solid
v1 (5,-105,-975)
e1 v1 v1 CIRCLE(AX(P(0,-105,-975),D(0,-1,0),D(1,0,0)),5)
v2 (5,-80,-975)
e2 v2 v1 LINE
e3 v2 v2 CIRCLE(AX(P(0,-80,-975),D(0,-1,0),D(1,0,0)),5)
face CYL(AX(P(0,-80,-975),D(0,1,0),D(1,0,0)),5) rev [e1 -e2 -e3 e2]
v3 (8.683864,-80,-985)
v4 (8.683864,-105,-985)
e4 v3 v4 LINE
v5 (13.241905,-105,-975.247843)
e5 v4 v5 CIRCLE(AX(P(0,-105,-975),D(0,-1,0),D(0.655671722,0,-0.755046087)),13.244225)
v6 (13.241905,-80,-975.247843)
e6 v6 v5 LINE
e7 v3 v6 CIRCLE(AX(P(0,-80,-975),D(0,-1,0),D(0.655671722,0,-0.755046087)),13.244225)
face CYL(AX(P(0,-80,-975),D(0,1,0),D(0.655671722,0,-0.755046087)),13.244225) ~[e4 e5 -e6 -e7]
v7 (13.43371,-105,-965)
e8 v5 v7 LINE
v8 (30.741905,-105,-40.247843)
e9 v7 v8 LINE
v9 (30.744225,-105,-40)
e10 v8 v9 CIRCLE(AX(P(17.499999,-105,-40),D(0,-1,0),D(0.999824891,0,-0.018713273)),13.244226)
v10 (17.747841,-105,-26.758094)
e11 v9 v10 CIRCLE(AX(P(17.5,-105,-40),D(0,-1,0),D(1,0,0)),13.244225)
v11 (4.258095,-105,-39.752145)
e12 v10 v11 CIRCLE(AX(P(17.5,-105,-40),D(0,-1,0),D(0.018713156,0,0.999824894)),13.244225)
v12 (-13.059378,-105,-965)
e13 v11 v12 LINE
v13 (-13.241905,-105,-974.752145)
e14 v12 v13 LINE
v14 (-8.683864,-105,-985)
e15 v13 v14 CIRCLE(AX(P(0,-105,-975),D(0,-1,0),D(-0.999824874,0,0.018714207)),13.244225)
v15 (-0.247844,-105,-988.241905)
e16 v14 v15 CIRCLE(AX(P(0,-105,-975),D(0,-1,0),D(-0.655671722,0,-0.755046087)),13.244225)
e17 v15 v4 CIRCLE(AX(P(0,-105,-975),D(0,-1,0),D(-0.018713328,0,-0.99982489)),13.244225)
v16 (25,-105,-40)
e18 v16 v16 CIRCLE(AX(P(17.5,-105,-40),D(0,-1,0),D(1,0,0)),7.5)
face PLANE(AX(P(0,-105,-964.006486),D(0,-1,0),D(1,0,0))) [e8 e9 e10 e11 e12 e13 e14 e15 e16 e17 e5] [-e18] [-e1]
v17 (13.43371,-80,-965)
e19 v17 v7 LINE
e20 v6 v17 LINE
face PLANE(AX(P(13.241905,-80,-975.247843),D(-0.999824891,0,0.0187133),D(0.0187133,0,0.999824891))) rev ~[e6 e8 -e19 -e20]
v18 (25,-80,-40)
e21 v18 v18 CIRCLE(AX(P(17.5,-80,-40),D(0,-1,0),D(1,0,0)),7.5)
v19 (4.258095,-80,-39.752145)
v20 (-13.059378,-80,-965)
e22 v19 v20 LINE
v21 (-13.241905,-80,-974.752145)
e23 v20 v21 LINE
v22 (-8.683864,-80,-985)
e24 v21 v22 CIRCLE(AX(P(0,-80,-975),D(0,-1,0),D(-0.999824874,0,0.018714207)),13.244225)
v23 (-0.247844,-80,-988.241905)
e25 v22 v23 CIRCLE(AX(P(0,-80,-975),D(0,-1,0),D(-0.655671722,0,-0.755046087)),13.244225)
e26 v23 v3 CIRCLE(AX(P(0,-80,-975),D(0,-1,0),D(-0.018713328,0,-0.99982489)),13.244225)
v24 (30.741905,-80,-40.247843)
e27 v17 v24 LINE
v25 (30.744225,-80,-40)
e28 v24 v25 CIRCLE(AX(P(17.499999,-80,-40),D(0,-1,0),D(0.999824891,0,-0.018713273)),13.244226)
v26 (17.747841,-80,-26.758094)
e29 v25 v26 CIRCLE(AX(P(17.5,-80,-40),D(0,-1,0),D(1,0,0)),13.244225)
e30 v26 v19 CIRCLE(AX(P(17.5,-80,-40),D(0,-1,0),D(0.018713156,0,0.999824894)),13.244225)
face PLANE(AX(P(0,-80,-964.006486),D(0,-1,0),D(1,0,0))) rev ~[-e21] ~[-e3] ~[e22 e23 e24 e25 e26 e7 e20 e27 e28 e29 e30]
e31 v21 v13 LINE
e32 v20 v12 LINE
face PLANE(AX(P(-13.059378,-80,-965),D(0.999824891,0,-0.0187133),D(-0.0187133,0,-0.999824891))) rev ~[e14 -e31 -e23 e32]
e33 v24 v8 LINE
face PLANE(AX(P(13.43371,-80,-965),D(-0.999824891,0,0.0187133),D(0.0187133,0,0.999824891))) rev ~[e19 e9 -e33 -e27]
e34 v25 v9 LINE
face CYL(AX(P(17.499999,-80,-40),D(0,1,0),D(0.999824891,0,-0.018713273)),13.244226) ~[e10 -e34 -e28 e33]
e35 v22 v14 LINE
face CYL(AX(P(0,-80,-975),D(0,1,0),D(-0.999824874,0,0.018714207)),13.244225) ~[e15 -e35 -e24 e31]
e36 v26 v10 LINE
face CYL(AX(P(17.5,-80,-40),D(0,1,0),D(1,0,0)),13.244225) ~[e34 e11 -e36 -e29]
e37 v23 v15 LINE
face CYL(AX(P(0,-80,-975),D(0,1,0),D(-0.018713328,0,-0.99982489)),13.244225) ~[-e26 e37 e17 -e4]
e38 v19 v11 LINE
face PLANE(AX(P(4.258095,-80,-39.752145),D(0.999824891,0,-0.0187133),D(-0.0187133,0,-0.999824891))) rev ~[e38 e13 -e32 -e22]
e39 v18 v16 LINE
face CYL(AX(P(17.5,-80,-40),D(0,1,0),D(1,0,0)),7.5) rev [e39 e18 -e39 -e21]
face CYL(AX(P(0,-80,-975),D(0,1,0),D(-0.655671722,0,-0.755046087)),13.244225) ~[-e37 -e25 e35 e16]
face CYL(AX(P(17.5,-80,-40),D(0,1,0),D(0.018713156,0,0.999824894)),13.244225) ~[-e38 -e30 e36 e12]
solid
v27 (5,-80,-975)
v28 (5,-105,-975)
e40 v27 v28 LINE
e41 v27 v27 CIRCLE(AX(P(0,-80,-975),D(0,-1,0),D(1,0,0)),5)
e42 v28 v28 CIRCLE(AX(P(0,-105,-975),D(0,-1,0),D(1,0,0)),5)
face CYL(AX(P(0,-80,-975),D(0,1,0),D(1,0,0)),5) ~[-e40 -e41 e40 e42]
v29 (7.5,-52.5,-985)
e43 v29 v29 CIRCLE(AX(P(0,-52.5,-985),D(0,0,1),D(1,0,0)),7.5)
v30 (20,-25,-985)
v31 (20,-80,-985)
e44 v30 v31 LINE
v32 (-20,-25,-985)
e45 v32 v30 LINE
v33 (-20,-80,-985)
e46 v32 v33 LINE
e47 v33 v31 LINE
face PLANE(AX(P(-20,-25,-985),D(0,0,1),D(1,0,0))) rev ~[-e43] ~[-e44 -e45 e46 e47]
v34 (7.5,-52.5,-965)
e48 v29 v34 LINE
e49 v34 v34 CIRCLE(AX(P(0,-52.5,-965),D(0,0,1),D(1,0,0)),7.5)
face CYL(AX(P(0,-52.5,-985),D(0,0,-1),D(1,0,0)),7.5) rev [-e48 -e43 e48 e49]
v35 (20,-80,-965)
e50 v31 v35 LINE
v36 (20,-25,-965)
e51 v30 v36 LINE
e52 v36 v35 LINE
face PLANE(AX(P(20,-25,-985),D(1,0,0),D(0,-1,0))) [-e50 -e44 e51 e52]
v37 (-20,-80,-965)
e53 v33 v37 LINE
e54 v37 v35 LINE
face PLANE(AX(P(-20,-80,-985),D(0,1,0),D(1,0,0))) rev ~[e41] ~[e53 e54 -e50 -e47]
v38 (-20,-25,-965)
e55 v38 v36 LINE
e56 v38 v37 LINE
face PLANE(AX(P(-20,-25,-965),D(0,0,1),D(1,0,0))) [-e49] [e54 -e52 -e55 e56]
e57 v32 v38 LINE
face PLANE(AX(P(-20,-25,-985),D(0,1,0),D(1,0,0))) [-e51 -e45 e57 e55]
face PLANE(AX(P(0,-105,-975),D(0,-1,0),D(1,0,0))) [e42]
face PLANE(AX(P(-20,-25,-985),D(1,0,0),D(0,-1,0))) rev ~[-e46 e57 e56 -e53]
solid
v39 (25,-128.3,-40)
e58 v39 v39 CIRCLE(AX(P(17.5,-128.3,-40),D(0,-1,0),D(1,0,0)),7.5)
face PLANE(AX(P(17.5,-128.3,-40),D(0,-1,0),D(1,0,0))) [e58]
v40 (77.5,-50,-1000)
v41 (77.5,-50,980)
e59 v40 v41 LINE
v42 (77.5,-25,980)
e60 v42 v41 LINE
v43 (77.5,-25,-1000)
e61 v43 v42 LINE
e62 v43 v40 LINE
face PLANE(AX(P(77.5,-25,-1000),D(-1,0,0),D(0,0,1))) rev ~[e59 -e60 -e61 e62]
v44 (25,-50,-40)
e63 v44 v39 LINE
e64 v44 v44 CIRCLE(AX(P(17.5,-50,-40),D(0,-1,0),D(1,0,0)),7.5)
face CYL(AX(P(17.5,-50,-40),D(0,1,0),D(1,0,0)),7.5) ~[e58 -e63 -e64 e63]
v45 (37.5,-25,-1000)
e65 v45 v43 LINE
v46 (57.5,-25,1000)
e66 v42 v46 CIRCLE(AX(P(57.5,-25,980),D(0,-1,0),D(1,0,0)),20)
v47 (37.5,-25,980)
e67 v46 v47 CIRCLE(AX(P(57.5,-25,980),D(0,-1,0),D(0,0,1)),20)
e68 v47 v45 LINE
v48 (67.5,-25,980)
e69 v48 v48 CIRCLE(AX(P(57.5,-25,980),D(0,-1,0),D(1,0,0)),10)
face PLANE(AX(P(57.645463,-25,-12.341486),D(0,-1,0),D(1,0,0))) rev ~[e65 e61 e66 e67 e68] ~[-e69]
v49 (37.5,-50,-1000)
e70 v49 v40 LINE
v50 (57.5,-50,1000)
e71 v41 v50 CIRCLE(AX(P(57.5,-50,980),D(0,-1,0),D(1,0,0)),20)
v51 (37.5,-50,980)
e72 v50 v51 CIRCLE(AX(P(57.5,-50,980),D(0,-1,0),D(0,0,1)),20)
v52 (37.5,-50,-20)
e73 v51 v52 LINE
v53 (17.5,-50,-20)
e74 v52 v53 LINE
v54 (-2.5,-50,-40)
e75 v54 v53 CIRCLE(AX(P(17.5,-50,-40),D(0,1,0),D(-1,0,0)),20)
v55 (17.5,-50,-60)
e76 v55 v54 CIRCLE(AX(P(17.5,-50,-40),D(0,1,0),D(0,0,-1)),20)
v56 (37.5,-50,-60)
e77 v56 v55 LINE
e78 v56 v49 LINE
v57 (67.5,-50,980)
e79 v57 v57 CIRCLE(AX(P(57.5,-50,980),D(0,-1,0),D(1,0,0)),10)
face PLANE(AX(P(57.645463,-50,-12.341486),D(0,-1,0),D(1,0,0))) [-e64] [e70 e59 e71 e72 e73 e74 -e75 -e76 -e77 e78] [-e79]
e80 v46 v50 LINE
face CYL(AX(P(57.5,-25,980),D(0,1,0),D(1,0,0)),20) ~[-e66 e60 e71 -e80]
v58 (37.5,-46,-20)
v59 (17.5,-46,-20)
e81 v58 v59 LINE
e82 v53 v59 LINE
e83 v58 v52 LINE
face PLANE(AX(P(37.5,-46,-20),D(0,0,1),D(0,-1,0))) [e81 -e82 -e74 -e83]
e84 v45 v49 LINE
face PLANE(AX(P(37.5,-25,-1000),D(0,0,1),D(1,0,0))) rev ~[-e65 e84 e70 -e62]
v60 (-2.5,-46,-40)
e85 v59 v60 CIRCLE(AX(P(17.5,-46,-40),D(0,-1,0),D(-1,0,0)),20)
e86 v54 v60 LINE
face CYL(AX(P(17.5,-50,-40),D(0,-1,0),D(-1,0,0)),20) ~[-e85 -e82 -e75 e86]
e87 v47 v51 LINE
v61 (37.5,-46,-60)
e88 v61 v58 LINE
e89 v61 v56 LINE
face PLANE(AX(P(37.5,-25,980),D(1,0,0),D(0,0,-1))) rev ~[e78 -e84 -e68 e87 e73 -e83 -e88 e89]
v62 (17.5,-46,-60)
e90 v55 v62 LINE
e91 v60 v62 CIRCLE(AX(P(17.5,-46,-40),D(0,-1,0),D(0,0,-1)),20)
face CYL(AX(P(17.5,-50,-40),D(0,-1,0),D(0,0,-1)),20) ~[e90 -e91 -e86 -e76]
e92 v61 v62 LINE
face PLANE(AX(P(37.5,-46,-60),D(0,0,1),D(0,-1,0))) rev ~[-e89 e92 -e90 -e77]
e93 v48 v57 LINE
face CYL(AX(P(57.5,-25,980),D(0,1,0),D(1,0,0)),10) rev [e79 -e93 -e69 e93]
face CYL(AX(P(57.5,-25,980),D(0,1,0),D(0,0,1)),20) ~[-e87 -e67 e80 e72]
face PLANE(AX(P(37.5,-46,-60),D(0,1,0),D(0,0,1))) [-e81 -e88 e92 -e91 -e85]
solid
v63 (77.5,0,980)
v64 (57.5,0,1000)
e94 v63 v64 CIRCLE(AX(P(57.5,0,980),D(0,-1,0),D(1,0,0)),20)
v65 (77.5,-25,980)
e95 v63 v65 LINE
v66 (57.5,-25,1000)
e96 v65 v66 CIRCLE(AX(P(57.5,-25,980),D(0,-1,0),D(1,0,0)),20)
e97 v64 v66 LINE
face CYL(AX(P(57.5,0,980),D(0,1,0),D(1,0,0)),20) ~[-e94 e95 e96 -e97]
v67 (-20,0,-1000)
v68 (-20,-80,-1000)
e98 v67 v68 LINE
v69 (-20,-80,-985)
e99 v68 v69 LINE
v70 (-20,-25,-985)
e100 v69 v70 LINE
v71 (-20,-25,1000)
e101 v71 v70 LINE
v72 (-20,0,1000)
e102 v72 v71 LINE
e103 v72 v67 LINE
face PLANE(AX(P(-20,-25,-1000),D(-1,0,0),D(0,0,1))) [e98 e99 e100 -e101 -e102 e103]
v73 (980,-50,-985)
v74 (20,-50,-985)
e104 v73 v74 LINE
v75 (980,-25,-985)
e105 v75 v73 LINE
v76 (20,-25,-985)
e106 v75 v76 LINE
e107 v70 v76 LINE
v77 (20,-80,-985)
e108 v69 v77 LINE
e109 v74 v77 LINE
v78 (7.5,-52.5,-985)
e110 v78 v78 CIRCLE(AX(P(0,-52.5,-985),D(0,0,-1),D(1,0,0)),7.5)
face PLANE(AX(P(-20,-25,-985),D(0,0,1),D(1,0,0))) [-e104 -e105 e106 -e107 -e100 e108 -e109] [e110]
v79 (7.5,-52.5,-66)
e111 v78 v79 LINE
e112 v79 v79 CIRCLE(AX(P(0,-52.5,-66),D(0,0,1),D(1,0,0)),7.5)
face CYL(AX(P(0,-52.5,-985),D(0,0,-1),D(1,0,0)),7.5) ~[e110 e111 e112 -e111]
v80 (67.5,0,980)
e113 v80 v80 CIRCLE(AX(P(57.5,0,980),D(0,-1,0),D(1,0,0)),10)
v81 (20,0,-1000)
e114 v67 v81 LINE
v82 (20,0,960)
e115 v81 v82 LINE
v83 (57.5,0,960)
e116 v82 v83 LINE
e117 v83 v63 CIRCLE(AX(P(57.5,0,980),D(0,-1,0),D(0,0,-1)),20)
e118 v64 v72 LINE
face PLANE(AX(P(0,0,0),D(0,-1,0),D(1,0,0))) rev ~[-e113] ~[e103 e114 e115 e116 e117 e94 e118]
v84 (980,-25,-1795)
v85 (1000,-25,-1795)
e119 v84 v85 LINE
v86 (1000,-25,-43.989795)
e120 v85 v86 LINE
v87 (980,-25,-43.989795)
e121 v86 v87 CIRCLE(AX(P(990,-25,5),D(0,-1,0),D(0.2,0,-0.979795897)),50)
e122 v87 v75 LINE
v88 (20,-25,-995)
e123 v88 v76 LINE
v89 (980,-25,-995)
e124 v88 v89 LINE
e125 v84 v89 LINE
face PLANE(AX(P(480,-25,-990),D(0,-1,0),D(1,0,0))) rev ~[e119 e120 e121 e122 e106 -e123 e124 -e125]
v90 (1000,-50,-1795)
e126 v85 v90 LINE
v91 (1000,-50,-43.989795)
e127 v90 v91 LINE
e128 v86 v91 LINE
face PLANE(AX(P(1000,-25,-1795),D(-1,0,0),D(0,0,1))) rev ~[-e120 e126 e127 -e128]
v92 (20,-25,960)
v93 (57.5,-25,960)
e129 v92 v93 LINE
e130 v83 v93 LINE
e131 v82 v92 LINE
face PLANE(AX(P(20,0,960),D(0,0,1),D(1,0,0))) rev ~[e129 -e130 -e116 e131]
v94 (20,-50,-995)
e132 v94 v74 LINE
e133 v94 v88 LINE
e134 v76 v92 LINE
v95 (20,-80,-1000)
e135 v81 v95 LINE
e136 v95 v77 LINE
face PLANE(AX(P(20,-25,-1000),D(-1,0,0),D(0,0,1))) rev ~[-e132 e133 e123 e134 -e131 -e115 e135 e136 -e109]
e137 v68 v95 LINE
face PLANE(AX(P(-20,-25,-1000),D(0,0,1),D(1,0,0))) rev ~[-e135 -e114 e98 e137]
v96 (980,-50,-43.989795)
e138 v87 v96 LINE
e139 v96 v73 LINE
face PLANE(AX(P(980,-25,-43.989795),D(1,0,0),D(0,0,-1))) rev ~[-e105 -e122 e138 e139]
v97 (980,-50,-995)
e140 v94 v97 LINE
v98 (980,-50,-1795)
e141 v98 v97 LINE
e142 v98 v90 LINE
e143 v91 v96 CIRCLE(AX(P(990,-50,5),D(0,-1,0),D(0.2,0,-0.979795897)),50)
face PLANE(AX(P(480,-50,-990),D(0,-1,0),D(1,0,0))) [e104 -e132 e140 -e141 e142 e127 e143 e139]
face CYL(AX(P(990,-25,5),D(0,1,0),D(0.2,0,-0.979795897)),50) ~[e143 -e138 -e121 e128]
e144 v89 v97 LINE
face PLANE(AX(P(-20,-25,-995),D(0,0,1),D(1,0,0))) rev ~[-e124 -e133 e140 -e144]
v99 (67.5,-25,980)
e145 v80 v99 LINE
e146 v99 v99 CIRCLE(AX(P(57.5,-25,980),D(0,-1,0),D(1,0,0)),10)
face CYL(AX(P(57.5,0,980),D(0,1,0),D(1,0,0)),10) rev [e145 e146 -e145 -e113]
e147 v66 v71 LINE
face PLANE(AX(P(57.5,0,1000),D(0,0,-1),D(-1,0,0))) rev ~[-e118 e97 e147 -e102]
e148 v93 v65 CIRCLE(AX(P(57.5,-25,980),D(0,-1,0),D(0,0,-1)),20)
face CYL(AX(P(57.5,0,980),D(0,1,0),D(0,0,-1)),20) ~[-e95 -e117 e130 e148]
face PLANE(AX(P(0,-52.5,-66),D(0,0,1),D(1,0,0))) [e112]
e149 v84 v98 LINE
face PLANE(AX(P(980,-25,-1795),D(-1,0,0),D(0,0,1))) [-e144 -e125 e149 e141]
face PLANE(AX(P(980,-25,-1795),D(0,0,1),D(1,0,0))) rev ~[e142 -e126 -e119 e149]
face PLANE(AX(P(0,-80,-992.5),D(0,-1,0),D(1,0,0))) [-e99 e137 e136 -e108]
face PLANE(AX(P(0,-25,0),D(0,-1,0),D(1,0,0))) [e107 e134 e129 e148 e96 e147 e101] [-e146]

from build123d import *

# Parameters (mm, degrees)
F0_R      = 10
F1_DEPTH  = 25
F2_R      = 10
F3_DEPTH  = 25
F4_W      = 40
F4_H      = 15
F5_DEPTH  = 55
F6_W      = 4
F6_H      = 40
F7_DEPTH  = 40
F9_DEPTH  = 5
F10_R     = 7.5
F11_DEPTH = 919
F12_DEPTH = 20
F14_R     = 5
F14_R_2   = 7.5
F15_DEPTH = 25
F13_R     = 5
F16_DEPTH = 25
F8_R      = 7.5
F17_DEPTH = 78.3
F18_W     = 1000
F18_H     = 10
F18_W_2   = 20
F18_H_2   = 800
F19_DEPTH = 25


with BuildPart() as f1:
    # F0 (on Front) → F1 (new body)
    with BuildSketch(Plane.XZ):
        Polygon((20, 960), (20, 1000), (-20, 1000), (-20, -1000), (20, -1000), align=None)
        with BuildLine():
            Line((57.5, 1000), (20, 1000))
            Line((20, 1000), (20, 960))
            Line((20, 960), (57.5, 960))
            ThreePointArc((57.5, 960), (37.5, 980), (57.5, 1000))
        make_face()
        with BuildLine():
            ThreePointArc((77.5, 980), (71.6421356237, 994.1421356237), (57.5, 1000))
            ThreePointArc((57.5, 1000), (37.5, 980), (57.5, 960))
            ThreePointArc((57.5, 960), (71.6421356237, 965.8578643763), (77.5, 980))
        make_face()
        with Locations((57.5, 980)):
            Circle(F0_R, mode=Mode.SUBTRACT)
    extrude(amount=F1_DEPTH)

    # F4 (on face) → F5 (join)
    with BuildSketch(Plane.XZ.offset(25)):
        with Locations((0, -992.5)):
            Rectangle(F4_W, F4_H)
    extrude(amount=F5_DEPTH)

    # F10 (on face) → F11 (join)
    with BuildSketch(Plane.XY.offset(-985)):
        with Locations((0, -52.5)):
            Circle(F10_R)
    extrude(amount=F11_DEPTH)


with BuildPart() as f3:
    # F2 (on face) → F3 (new body)
    with BuildSketch(Plane.XZ.offset(25)):
        with BuildLine():
            Line((77.5, -1000), (77.5, 980))
            ThreePointArc((77.5, 980), (71.6421356237, 965.8578643763), (57.5, 960))
            Line((57.5, 960), (37.5, 960))
            Line((37.5, 960), (37.5, -1000))
            Line((37.5, -1000), (77.5, -1000))
        make_face()
        with BuildLine():
            ThreePointArc((77.5, 980), (71.6421356237, 994.1421356237), (57.5, 1000))
            ThreePointArc((57.5, 1000), (43.3578643763, 994.1421356237), (37.5, 980))
            ThreePointArc((37.5, 980), (43.3578643763, 965.8578643763), (57.5, 960))
            ThreePointArc((57.5, 960), (71.6421356237, 965.8578643763), (77.5, 980))
        make_face()
        with Locations((57.5, 980)):
            Circle(F2_R, mode=Mode.SUBTRACT)
        with BuildLine():
            ThreePointArc((57.5, 960), (43.3578643763, 965.8578643763), (37.5, 980))
            Line((37.5, 980), (37.5, 960))
            Line((37.5, 960), (57.5, 960))
        make_face()
    extrude(amount=F3_DEPTH)

    # F6 (on face) → F7 (join)
    with BuildSketch(Plane(origin=(37.5, 0, 0), x_dir=(0, -1, 0), z_dir=(-1, 0, 0))):
        with Locations((48, -40)):
            Rectangle(F6_W, F6_H)
    extrude(amount=F7_DEPTH)

    # F8 (on face) → F9 (cut)
    with BuildSketch(Plane.XZ.offset(50)):
        with BuildLine():
            ThreePointArc((-2.5, -40), (3.3578643763, -25.8578643763), (17.5, -20))
            Line((17.5, -20), (-2.5, -20))
            Line((-2.5, -20), (-2.5, -40))
        make_face()
        with BuildLine():
            Line((-2.5, -60), (17.5, -60))
            ThreePointArc((17.5, -60), (3.3578643763, -54.1421356237), (-2.5, -40))
            Line((-2.5, -40), (-2.5, -60))
        make_face()
    extrude(amount=-F9_DEPTH, mode=Mode.SUBTRACT)

    # F8 (on face) → F17 (join)
    with BuildSketch(Plane.XZ.offset(50)):
        with Locations((17.5, -40)):
            Circle(F8_R)
    extrude(amount=F17_DEPTH)


with BuildPart() as f12:
    # F12 (new): a face of the model
    f12_faces = [f1.part.faces().sort_by_distance(p)[0] for p in [
        (19.3199264746, -52.5, -985),
    ]]
    extrude(f12_faces, amount=F12_DEPTH)

    # F13 (on face) → F16 (join)
    with BuildSketch(Plane.XZ.offset(80)):
        with Locations((0, -975)):
            Circle(F13_R)
    extrude(amount=F16_DEPTH)


with BuildPart() as f15:
    # F14 (on face) → F15 (new body)
    with BuildSketch(Plane.XZ.offset(80)):
        with BuildLine():
            Line((-8.6838635851, -965), (8.6838635851, -965))
            ThreePointArc((8.6838635851, -965), (0, -961.755775343), (-8.6838635851, -965))
        make_face()
        with BuildLine():
            Line((13.2419054738, -975.2478430705), (13.4337100232, -965))
            Line((13.4337100232, -965), (8.6838635851, -965))
            ThreePointArc((8.6838635851, -965), (12.0503221321, -969.5046180045), (13.244224657, -975))
            ThreePointArc((13.244224657, -975), (13.2436448485, -975.1239269605), (13.2419054738, -975.2478430705))
        make_face()
        with BuildLine():
            Line((-8.6838635851, -965), (-13.0593784724, -965))
            Line((-13.0593784724, -965), (-13.2419052476, -974.7521448442))
            ThreePointArc((-13.2419052476, -974.7521448442), (-11.9983714308, -969.3920975603), (-8.6838635851, -965))
        make_face()
        with BuildLine():
            ThreePointArc((-0.2478435243, -988.2419054653), (4.5187494263, -987.4495136606), (8.6838635851, -985))
            Line((8.6838635851, -985), (-8.6838635851, -985))
            ThreePointArc((-8.6838635851, -985), (-4.7509299861, -987.3627727889), (-0.2478435243, -988.2419054653))
        make_face()
        with BuildLine():
            Line((13.4337100232, -965), (30.7419054788, -40.2478428035))
            ThreePointArc((30.7419054788, -40.2478428035), (17.2521509276, -53.2419053614), (4.2580947559, -39.7521446587))
            Line((4.2580947559, -39.7521446587), (-13.0593784724, -965))
            Line((-13.0593784724, -965), (-8.6838635851, -965))
            ThreePointArc((-8.6838635851, -965), (0, -961.755775343), (8.6838635851, -965))
            Line((8.6838635851, -965), (13.4337100232, -965))
        make_face()
        with BuildLine():
            ThreePointArc((8.6838635851, -985), (11.9983739898, -980.6078969645), (13.2419054738, -975.2478430705))
            ThreePointArc((13.2419054738, -975.2478430705), (13.2436448485, -975.1239269605), (13.244224657, -975))
            ThreePointArc((13.244224657, -975), (12.0503221321, -969.5046180045), (8.6838635851, -965))
            Line((8.6838635851, -965), (-8.6838635851, -965))
            ThreePointArc((-8.6838635851, -965), (-11.9983714308, -969.3920975603), (-13.2419052476, -974.7521448442))
            ThreePointArc((-13.2419052476, -974.7521448442), (-12.1012176474, -980.3823803484), (-8.6838635851, -985))
            Line((-8.6838635851, -985), (8.6838635851, -985))
        make_face()
        with Locations((0, -975)):
            Circle(F14_R, mode=Mode.SUBTRACT)
        with BuildLine():
            ThreePointArc((4.2580947559, -39.7521446587), (17.2521509276, -53.2419053614), (30.7419054788, -40.2478428035))
            ThreePointArc((30.7419054788, -40.2478428035), (30.7436448497, -40.1239268271), (30.744224657, -40))
            ThreePointArc((30.744224657, -40), (26.9523000332, -30.7229578611), (17.7478412406, -26.758094492))
            ThreePointArc((17.7478412406, -26.758094492), (8.31181412, -30.4613037055), (4.2580947559, -39.7521446587))
        make_face()
        with Locations((17.5, -40)):
            Circle(F14_R_2, mode=Mode.SUBTRACT)
    extrude(amount=F15_DEPTH)


with BuildPart() as f1_1:
    add(f1.part)

    # F18 (on face) → F19 (join)
    with BuildSketch(Plane.XZ.offset(25)):
        with Locations((480, -990)):
            Rectangle(F18_W, F18_H)
        with Locations((990, -990)):
            Rectangle(F18_W_2, F18_H)
        with BuildLine():
            Line((980, -43.9897948557), (980, -985))
            Line((980, -985), (1000, -985))
            Line((1000, -985), (1000, -43.9897948557))
            ThreePointArc((1000, -43.9897948557), (990, -45), (980, -43.9897948557))
        make_face()
        with Locations((990, -1395)):
            Rectangle(F18_W_2, F18_H_2)
        with BuildLine():
            ThreePointArc((1040, 5), (958.3772233983, 43.7298334621), (980, -43.9897948557))
            Line((980, -43.9897948557), (980, 5))
            Line((980, 5), (1000, 5))
            Line((1000, 5), (1000, -43.9897948557))
            ThreePointArc((1000, -43.9897948557), (1028.7298334621, -26.6227766017), (1040, 5))
        make_face()
        with BuildLine():
            Line((980, 5), (980, -43.9897948557))
            ThreePointArc((980, -43.9897948557), (990, -45), (1000, -43.9897948557))
            Line((1000, -43.9897948557), (1000, 5))
            Line((1000, 5), (980, 5))
        make_face()
    extrude(amount=F19_DEPTH)


solid = Compound([f3.part, f12.part, f15.part, f1_1.part])
